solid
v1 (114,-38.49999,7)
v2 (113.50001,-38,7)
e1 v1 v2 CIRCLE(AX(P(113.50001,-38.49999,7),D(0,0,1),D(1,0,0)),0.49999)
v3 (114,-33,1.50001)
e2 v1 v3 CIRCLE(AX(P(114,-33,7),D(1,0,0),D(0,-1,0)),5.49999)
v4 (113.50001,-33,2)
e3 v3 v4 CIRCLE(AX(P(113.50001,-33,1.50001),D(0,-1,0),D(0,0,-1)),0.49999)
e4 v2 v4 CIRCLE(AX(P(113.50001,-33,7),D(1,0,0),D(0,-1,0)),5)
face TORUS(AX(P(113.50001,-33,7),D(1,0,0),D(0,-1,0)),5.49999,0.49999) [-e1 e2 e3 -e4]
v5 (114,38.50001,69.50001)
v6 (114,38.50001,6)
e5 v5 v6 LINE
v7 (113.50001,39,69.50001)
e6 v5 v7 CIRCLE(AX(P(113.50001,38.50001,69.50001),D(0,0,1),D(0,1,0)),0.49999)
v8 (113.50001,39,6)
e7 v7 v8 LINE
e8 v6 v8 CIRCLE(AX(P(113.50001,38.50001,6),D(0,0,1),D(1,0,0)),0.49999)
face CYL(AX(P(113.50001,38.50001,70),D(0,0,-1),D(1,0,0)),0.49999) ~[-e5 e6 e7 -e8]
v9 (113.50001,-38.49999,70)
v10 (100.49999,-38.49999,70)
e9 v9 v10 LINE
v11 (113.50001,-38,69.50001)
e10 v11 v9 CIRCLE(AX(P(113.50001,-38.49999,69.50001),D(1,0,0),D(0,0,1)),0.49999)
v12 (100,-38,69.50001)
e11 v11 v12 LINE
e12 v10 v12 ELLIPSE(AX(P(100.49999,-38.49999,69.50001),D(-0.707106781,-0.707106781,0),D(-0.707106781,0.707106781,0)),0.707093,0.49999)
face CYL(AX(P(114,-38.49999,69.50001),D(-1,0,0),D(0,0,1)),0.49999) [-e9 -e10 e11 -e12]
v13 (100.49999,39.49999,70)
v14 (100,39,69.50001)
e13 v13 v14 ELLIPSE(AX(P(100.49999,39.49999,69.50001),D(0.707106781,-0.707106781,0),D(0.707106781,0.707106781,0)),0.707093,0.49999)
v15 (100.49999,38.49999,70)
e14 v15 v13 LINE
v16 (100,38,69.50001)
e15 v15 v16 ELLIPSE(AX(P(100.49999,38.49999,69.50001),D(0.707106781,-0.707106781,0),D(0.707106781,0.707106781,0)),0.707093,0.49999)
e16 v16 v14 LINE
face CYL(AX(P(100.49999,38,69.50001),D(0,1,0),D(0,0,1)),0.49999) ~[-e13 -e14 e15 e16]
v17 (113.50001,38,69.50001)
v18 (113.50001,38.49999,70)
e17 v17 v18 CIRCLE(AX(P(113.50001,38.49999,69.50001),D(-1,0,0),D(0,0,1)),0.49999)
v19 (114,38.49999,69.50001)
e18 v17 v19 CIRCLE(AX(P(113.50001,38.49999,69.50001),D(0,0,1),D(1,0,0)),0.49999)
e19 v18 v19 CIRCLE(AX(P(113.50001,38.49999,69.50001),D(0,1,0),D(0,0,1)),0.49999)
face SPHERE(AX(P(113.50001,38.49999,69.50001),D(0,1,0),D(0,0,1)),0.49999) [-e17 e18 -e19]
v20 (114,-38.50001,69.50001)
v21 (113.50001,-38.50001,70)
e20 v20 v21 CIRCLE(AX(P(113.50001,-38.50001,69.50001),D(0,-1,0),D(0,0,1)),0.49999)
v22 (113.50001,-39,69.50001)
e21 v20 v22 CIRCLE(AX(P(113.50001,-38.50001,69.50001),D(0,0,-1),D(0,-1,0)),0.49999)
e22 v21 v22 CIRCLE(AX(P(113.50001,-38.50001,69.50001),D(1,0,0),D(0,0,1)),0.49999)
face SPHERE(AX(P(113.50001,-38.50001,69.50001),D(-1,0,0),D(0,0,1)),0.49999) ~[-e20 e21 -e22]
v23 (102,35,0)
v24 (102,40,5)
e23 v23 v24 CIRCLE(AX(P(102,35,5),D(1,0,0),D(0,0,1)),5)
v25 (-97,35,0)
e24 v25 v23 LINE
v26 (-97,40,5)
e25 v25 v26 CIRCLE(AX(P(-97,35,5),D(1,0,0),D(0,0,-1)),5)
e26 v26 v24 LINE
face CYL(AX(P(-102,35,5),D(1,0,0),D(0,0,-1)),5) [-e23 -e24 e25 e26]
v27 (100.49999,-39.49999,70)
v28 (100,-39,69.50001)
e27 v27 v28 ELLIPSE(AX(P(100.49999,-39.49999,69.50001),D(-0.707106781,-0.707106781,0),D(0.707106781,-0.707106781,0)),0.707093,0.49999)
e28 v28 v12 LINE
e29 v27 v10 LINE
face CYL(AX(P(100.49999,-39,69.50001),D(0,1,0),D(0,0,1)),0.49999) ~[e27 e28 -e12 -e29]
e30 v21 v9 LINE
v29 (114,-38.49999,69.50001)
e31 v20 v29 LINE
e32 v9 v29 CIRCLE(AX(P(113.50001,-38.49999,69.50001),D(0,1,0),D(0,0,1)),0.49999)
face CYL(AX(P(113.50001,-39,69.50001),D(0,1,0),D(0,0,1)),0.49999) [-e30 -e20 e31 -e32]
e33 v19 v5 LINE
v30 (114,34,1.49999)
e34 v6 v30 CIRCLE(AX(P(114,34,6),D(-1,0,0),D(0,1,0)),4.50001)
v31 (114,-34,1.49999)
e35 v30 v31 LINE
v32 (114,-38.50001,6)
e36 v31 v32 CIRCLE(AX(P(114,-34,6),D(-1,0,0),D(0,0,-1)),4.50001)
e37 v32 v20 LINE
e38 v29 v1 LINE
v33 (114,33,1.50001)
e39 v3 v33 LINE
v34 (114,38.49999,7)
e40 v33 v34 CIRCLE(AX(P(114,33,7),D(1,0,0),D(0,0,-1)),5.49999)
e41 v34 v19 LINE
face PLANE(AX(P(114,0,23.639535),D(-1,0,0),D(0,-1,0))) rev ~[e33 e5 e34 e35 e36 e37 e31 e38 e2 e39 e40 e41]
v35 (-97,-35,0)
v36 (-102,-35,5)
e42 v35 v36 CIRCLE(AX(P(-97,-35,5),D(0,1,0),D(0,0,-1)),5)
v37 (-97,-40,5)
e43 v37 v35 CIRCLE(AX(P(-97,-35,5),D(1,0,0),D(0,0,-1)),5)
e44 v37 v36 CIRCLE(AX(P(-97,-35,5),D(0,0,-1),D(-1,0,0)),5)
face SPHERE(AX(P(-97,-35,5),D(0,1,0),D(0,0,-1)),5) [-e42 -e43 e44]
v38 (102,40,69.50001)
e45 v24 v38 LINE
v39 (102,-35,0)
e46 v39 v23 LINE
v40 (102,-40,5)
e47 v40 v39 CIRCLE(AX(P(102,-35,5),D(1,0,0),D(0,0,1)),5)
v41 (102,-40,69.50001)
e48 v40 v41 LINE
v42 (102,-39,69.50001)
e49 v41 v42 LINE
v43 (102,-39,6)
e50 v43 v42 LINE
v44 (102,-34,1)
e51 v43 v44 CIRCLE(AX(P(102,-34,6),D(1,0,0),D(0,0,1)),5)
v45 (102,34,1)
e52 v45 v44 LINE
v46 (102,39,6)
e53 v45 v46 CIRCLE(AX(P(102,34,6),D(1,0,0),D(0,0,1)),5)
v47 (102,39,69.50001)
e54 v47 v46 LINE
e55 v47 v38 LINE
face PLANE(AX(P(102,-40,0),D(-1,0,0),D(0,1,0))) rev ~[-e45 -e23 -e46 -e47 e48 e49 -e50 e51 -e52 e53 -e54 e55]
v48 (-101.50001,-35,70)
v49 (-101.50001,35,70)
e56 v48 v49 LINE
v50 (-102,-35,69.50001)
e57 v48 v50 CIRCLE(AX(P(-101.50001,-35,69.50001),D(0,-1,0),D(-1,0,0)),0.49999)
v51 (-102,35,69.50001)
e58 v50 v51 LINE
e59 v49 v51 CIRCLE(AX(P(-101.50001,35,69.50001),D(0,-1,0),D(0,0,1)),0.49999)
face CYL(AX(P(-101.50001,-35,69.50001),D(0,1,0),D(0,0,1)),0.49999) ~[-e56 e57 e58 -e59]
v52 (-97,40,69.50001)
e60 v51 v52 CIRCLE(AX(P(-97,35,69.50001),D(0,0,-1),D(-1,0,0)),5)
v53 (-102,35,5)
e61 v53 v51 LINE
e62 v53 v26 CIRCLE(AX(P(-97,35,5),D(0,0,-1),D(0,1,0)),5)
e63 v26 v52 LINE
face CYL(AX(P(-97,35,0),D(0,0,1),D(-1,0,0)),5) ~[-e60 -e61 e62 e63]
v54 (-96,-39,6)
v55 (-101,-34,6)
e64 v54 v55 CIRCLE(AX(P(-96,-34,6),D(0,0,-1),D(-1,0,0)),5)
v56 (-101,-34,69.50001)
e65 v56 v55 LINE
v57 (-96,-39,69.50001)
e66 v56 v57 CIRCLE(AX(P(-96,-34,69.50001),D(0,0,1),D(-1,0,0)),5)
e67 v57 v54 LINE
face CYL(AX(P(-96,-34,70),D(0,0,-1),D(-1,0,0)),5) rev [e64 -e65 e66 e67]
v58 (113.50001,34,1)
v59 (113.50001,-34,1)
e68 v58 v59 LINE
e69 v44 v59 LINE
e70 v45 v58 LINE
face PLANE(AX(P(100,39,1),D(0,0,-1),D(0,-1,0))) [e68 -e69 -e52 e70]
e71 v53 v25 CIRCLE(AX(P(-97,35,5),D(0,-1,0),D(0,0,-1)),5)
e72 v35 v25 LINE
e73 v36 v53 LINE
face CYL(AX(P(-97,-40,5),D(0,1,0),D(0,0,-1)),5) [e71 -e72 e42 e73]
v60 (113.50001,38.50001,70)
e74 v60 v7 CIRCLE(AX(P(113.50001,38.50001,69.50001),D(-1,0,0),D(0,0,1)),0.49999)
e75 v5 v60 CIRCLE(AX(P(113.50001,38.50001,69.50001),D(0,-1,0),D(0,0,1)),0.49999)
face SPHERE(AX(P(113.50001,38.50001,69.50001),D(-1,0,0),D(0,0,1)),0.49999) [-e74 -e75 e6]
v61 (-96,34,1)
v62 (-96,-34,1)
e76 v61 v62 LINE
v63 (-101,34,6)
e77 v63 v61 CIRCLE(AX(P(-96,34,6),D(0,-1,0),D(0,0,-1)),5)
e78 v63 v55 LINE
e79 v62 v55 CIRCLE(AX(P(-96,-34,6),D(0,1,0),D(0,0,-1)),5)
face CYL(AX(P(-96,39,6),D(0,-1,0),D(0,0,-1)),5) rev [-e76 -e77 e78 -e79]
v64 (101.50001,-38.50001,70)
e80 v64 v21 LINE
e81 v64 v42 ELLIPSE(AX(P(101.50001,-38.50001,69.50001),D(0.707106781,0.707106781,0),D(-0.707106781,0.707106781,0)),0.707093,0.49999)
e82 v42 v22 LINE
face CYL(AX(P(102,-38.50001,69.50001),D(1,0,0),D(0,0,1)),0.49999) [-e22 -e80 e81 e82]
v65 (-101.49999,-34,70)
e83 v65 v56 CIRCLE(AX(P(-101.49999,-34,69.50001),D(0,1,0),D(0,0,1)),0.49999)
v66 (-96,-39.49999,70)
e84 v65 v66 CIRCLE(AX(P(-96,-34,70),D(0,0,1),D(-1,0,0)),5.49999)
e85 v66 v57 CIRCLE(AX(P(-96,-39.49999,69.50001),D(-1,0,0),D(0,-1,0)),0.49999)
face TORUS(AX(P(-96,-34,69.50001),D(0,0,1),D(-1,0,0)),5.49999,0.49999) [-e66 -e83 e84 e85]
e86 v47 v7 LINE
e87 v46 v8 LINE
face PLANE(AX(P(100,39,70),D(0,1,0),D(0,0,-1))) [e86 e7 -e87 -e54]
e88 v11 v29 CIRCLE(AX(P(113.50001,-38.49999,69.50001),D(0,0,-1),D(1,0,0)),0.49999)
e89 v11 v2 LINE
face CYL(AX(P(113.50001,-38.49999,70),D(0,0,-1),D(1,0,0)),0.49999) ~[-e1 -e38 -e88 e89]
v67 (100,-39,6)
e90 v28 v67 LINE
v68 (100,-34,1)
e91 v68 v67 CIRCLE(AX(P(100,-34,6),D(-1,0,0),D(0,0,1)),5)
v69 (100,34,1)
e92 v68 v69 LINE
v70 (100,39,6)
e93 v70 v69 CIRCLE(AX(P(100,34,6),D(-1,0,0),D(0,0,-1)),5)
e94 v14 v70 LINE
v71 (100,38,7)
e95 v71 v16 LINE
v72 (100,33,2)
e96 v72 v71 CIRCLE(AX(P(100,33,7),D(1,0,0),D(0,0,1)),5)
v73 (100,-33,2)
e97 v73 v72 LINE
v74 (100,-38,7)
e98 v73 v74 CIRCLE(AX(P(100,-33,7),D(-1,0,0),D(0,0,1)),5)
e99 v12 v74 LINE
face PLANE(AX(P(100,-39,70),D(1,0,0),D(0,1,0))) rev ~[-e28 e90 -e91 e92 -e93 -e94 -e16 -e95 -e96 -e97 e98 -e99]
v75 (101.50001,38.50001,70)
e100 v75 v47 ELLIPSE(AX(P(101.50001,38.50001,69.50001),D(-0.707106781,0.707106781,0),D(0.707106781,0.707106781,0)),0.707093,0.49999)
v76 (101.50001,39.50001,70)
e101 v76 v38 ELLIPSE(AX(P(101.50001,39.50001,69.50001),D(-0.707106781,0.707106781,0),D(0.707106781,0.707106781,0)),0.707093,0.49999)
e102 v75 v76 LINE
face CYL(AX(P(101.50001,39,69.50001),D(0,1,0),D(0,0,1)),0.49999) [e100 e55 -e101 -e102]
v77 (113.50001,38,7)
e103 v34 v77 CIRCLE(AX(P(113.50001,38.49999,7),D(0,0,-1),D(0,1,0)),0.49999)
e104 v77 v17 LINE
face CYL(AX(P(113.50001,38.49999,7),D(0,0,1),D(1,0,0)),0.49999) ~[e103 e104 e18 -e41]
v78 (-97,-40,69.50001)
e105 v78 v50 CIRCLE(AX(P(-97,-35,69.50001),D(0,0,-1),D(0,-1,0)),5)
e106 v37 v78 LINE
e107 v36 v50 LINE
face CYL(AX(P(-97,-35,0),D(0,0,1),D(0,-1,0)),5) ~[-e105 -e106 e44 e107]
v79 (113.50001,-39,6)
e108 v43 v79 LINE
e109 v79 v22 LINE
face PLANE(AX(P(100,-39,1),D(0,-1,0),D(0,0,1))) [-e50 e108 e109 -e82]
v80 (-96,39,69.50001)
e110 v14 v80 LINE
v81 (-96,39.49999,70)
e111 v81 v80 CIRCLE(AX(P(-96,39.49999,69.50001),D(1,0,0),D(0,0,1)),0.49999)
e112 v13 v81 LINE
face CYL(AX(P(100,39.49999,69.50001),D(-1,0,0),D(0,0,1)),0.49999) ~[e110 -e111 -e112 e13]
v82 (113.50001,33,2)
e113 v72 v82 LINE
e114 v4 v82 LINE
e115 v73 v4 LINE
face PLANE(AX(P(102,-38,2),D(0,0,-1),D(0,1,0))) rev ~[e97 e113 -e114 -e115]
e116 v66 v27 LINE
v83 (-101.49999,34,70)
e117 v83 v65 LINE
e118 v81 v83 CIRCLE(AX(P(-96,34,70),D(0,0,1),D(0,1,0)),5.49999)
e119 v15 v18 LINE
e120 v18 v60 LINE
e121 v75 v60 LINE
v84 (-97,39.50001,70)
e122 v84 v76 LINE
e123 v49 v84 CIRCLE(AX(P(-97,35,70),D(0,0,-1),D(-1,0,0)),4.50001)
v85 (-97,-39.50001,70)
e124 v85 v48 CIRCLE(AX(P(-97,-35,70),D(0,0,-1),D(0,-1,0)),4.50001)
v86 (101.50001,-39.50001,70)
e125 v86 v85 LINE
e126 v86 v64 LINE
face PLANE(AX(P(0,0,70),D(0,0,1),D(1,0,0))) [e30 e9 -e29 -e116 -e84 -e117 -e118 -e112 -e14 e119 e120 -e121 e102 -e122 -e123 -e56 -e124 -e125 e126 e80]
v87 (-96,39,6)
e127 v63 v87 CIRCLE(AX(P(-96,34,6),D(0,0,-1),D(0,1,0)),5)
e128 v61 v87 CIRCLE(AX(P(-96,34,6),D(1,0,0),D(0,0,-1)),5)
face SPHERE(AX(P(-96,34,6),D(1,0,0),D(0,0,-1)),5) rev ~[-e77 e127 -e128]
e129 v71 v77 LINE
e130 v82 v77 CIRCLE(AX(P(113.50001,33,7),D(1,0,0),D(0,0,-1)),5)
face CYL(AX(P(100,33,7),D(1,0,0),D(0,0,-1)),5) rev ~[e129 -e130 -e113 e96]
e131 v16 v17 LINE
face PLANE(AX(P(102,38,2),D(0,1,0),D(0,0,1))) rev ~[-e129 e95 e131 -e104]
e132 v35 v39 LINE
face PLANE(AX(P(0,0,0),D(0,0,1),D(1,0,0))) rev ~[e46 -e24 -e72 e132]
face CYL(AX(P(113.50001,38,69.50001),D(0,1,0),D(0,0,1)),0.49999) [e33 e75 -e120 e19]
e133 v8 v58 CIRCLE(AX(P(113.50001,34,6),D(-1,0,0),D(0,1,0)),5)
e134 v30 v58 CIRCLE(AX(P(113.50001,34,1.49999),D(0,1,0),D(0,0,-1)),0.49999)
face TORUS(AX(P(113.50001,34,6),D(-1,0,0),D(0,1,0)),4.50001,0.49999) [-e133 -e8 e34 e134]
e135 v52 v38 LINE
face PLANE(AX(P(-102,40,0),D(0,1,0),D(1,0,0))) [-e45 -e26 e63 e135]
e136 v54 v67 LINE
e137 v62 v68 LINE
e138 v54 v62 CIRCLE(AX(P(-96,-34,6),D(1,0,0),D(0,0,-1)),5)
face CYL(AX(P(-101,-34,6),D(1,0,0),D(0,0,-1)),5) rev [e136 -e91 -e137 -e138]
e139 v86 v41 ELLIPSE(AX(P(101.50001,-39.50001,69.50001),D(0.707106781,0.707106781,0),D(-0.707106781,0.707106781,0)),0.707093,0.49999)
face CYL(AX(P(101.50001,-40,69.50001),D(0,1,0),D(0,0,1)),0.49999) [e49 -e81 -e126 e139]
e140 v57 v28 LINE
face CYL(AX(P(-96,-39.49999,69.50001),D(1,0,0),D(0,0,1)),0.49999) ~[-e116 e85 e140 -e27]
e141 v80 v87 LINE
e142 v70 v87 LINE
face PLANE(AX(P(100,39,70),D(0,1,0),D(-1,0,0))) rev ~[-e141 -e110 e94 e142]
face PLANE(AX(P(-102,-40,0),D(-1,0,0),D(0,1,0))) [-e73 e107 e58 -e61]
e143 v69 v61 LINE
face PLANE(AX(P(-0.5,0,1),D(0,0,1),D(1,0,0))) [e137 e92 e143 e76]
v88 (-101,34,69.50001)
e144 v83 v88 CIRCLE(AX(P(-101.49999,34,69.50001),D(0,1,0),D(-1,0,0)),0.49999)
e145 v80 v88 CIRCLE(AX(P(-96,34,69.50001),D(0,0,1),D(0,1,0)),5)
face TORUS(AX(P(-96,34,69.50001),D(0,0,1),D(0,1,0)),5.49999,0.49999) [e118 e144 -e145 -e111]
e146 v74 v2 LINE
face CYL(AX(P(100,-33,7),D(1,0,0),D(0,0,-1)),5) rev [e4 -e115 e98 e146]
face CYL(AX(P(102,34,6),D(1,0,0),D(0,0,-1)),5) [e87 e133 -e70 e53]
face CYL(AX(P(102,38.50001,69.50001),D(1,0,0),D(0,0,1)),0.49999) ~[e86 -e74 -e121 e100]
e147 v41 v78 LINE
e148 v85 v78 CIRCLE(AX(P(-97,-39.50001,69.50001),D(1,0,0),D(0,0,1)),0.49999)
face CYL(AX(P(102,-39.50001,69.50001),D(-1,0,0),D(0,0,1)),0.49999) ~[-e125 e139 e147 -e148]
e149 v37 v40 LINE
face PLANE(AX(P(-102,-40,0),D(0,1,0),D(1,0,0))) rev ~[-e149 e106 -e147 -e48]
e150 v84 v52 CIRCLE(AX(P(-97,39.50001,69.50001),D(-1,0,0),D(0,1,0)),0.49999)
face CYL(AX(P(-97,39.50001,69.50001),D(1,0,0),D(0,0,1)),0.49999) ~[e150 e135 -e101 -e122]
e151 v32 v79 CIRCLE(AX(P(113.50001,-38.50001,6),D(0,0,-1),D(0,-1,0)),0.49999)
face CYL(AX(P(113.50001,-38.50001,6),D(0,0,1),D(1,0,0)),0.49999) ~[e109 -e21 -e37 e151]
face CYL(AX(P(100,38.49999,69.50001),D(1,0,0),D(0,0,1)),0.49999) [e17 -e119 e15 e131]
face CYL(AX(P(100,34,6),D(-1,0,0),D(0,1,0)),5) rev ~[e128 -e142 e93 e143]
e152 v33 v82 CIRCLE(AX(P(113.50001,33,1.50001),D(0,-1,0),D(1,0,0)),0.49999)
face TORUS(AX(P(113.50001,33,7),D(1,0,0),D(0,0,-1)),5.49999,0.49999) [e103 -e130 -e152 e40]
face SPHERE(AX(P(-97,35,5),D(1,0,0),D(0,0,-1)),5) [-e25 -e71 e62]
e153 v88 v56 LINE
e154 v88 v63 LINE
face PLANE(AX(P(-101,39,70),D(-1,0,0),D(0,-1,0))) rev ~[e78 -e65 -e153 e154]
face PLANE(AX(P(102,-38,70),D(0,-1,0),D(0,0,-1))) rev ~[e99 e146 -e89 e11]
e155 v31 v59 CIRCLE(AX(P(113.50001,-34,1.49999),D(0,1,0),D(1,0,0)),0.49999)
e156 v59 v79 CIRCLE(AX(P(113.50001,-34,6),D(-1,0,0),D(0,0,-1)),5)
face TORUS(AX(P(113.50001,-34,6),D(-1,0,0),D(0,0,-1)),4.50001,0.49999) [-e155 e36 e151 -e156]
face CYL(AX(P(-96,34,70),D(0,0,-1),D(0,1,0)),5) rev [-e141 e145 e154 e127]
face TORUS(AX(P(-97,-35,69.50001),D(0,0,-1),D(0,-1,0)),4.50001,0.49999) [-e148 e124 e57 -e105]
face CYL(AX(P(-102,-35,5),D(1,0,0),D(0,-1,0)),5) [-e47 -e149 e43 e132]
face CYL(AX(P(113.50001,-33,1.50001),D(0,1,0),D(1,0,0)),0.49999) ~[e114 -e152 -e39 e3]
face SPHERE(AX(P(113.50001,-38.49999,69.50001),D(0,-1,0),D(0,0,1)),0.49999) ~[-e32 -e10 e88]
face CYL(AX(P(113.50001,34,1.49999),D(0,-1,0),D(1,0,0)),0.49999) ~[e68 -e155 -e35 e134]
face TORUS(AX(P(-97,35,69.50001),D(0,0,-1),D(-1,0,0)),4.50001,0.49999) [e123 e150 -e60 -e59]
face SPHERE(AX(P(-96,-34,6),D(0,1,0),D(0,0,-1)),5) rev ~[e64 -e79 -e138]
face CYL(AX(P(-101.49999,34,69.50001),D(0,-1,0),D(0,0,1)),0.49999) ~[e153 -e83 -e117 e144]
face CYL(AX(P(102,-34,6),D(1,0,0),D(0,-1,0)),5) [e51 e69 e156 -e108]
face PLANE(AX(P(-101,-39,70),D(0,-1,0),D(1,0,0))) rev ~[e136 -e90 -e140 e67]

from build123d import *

# Parameters (mm, degrees)
F0_W     = 204
F0_H     = 80
F1_DEPTH = 70
F3_DEPTH = 69
F5_DEPTH = 2
F7_DEPTH = 14
F8_R     = 5
F9_R     = 0.49999


# Not quite as in the source:
# - a fillet or chamfer is up to 0.001 mm smaller than in the source, because OpenCascade refuses the exact size


with BuildPart() as f1:
    # F0 (on Top) → F1 (new body)
    with BuildSketch(Plane.XY):
        Rectangle(F0_W, F0_H)
    extrude(amount=F1_DEPTH)

    # F2 (on face) → F3 (cut)
    with BuildSketch(Plane.XY.offset(70)):
        Polygon((-70.4128742218, 39), (-101, 39), (-101, 20.586034283), (-101, -39), (-57.7337481081, -39), (100, -39), (100, -8.4424866363), (100, 39), align=None)
    extrude(amount=-F3_DEPTH, mode=Mode.SUBTRACT)

    # F4 (on face) → F5 (cut)
    with BuildSketch(Plane.YZ.offset(102)):
        Polygon((38, 2), (38, 70), (-38, 70), (-38, 42.2970801592), (-38, 2), align=None)
    extrude(amount=-F5_DEPTH, mode=Mode.SUBTRACT)

    # F6 (on face) → F7 (join)
    with BuildSketch(Plane(origin=(100, 0, 0), x_dir=(0, -1, 0), z_dir=(-1, 0, 0))):
        Polygon((39, 1), (39, 70), (38, 70), (38, 2), (-38, 2), (-38, 70), (-39, 70), (-39, 1), align=None)
    extrude(amount=-F7_DEPTH)

    # F8
    f8_edges = [f1.edges().sort_by_distance(p)[0] for p in [
        (-0.5, 39, 1),
        (-101, 0, 1),
        (-0.5, -39, 1),
        (0, 40, 0),
        (-102, 0, 0),
        (0, -40, 0),
        (-102, -40, 35),
        (-102, 40, 35),
        (-101, 39, 35.5),
        (-101, -39, 35.5),
        (108, 39, 1),
        (108, -39, 1),
        (107, -38, 2),
        (107, 38, 2),
    ]]
    fillet(f8_edges, radius=F8_R)

    # F9 (radius 0.5 in the source; OpenCascade refuses exactly that, so slightly less here)
    f9_edges = [f1.edges().sort_by_distance(p)[0] for p in [
        (2.5, 40, 70),
        (-100.535534, 38.535534, 70),
        (102, 39.5, 70),
        (-102, 0, 70),
        (108, 39, 70),
        (-100.535534, -38.535534, 70),
        (114, 38.5, 70),
        (2.5, -40, 70),
        (107, 38, 70),
        (102, -39.5, 70),
        (100, 38.5, 70),
        (108, -39, 70),
        (2, 39, 70),
        (114, -38.5, 70),
        (-99.535534, 37.535534, 70),
        (107, -38, 70),
        (-101, 0, 70),
        (100, -38.5, 70),
        (-99.535534, -37.535534, 70),
        (2, -39, 70),
        (114, -39, 38),
        (114, -37.535534, 2.464466),
        (114, 0, 1),
        (114, -38, 38.5),
        (114, 37.535534, 2.464466),
        (114, -36.535534, 3.464466),
        (114, 39, 38),
        (114, 0, 2),
        (114, 36.535534, 3.464466),
        (114, 38, 38.5),
    ]]
    fillet(f9_edges, radius=F9_R)


solid = f1.part
